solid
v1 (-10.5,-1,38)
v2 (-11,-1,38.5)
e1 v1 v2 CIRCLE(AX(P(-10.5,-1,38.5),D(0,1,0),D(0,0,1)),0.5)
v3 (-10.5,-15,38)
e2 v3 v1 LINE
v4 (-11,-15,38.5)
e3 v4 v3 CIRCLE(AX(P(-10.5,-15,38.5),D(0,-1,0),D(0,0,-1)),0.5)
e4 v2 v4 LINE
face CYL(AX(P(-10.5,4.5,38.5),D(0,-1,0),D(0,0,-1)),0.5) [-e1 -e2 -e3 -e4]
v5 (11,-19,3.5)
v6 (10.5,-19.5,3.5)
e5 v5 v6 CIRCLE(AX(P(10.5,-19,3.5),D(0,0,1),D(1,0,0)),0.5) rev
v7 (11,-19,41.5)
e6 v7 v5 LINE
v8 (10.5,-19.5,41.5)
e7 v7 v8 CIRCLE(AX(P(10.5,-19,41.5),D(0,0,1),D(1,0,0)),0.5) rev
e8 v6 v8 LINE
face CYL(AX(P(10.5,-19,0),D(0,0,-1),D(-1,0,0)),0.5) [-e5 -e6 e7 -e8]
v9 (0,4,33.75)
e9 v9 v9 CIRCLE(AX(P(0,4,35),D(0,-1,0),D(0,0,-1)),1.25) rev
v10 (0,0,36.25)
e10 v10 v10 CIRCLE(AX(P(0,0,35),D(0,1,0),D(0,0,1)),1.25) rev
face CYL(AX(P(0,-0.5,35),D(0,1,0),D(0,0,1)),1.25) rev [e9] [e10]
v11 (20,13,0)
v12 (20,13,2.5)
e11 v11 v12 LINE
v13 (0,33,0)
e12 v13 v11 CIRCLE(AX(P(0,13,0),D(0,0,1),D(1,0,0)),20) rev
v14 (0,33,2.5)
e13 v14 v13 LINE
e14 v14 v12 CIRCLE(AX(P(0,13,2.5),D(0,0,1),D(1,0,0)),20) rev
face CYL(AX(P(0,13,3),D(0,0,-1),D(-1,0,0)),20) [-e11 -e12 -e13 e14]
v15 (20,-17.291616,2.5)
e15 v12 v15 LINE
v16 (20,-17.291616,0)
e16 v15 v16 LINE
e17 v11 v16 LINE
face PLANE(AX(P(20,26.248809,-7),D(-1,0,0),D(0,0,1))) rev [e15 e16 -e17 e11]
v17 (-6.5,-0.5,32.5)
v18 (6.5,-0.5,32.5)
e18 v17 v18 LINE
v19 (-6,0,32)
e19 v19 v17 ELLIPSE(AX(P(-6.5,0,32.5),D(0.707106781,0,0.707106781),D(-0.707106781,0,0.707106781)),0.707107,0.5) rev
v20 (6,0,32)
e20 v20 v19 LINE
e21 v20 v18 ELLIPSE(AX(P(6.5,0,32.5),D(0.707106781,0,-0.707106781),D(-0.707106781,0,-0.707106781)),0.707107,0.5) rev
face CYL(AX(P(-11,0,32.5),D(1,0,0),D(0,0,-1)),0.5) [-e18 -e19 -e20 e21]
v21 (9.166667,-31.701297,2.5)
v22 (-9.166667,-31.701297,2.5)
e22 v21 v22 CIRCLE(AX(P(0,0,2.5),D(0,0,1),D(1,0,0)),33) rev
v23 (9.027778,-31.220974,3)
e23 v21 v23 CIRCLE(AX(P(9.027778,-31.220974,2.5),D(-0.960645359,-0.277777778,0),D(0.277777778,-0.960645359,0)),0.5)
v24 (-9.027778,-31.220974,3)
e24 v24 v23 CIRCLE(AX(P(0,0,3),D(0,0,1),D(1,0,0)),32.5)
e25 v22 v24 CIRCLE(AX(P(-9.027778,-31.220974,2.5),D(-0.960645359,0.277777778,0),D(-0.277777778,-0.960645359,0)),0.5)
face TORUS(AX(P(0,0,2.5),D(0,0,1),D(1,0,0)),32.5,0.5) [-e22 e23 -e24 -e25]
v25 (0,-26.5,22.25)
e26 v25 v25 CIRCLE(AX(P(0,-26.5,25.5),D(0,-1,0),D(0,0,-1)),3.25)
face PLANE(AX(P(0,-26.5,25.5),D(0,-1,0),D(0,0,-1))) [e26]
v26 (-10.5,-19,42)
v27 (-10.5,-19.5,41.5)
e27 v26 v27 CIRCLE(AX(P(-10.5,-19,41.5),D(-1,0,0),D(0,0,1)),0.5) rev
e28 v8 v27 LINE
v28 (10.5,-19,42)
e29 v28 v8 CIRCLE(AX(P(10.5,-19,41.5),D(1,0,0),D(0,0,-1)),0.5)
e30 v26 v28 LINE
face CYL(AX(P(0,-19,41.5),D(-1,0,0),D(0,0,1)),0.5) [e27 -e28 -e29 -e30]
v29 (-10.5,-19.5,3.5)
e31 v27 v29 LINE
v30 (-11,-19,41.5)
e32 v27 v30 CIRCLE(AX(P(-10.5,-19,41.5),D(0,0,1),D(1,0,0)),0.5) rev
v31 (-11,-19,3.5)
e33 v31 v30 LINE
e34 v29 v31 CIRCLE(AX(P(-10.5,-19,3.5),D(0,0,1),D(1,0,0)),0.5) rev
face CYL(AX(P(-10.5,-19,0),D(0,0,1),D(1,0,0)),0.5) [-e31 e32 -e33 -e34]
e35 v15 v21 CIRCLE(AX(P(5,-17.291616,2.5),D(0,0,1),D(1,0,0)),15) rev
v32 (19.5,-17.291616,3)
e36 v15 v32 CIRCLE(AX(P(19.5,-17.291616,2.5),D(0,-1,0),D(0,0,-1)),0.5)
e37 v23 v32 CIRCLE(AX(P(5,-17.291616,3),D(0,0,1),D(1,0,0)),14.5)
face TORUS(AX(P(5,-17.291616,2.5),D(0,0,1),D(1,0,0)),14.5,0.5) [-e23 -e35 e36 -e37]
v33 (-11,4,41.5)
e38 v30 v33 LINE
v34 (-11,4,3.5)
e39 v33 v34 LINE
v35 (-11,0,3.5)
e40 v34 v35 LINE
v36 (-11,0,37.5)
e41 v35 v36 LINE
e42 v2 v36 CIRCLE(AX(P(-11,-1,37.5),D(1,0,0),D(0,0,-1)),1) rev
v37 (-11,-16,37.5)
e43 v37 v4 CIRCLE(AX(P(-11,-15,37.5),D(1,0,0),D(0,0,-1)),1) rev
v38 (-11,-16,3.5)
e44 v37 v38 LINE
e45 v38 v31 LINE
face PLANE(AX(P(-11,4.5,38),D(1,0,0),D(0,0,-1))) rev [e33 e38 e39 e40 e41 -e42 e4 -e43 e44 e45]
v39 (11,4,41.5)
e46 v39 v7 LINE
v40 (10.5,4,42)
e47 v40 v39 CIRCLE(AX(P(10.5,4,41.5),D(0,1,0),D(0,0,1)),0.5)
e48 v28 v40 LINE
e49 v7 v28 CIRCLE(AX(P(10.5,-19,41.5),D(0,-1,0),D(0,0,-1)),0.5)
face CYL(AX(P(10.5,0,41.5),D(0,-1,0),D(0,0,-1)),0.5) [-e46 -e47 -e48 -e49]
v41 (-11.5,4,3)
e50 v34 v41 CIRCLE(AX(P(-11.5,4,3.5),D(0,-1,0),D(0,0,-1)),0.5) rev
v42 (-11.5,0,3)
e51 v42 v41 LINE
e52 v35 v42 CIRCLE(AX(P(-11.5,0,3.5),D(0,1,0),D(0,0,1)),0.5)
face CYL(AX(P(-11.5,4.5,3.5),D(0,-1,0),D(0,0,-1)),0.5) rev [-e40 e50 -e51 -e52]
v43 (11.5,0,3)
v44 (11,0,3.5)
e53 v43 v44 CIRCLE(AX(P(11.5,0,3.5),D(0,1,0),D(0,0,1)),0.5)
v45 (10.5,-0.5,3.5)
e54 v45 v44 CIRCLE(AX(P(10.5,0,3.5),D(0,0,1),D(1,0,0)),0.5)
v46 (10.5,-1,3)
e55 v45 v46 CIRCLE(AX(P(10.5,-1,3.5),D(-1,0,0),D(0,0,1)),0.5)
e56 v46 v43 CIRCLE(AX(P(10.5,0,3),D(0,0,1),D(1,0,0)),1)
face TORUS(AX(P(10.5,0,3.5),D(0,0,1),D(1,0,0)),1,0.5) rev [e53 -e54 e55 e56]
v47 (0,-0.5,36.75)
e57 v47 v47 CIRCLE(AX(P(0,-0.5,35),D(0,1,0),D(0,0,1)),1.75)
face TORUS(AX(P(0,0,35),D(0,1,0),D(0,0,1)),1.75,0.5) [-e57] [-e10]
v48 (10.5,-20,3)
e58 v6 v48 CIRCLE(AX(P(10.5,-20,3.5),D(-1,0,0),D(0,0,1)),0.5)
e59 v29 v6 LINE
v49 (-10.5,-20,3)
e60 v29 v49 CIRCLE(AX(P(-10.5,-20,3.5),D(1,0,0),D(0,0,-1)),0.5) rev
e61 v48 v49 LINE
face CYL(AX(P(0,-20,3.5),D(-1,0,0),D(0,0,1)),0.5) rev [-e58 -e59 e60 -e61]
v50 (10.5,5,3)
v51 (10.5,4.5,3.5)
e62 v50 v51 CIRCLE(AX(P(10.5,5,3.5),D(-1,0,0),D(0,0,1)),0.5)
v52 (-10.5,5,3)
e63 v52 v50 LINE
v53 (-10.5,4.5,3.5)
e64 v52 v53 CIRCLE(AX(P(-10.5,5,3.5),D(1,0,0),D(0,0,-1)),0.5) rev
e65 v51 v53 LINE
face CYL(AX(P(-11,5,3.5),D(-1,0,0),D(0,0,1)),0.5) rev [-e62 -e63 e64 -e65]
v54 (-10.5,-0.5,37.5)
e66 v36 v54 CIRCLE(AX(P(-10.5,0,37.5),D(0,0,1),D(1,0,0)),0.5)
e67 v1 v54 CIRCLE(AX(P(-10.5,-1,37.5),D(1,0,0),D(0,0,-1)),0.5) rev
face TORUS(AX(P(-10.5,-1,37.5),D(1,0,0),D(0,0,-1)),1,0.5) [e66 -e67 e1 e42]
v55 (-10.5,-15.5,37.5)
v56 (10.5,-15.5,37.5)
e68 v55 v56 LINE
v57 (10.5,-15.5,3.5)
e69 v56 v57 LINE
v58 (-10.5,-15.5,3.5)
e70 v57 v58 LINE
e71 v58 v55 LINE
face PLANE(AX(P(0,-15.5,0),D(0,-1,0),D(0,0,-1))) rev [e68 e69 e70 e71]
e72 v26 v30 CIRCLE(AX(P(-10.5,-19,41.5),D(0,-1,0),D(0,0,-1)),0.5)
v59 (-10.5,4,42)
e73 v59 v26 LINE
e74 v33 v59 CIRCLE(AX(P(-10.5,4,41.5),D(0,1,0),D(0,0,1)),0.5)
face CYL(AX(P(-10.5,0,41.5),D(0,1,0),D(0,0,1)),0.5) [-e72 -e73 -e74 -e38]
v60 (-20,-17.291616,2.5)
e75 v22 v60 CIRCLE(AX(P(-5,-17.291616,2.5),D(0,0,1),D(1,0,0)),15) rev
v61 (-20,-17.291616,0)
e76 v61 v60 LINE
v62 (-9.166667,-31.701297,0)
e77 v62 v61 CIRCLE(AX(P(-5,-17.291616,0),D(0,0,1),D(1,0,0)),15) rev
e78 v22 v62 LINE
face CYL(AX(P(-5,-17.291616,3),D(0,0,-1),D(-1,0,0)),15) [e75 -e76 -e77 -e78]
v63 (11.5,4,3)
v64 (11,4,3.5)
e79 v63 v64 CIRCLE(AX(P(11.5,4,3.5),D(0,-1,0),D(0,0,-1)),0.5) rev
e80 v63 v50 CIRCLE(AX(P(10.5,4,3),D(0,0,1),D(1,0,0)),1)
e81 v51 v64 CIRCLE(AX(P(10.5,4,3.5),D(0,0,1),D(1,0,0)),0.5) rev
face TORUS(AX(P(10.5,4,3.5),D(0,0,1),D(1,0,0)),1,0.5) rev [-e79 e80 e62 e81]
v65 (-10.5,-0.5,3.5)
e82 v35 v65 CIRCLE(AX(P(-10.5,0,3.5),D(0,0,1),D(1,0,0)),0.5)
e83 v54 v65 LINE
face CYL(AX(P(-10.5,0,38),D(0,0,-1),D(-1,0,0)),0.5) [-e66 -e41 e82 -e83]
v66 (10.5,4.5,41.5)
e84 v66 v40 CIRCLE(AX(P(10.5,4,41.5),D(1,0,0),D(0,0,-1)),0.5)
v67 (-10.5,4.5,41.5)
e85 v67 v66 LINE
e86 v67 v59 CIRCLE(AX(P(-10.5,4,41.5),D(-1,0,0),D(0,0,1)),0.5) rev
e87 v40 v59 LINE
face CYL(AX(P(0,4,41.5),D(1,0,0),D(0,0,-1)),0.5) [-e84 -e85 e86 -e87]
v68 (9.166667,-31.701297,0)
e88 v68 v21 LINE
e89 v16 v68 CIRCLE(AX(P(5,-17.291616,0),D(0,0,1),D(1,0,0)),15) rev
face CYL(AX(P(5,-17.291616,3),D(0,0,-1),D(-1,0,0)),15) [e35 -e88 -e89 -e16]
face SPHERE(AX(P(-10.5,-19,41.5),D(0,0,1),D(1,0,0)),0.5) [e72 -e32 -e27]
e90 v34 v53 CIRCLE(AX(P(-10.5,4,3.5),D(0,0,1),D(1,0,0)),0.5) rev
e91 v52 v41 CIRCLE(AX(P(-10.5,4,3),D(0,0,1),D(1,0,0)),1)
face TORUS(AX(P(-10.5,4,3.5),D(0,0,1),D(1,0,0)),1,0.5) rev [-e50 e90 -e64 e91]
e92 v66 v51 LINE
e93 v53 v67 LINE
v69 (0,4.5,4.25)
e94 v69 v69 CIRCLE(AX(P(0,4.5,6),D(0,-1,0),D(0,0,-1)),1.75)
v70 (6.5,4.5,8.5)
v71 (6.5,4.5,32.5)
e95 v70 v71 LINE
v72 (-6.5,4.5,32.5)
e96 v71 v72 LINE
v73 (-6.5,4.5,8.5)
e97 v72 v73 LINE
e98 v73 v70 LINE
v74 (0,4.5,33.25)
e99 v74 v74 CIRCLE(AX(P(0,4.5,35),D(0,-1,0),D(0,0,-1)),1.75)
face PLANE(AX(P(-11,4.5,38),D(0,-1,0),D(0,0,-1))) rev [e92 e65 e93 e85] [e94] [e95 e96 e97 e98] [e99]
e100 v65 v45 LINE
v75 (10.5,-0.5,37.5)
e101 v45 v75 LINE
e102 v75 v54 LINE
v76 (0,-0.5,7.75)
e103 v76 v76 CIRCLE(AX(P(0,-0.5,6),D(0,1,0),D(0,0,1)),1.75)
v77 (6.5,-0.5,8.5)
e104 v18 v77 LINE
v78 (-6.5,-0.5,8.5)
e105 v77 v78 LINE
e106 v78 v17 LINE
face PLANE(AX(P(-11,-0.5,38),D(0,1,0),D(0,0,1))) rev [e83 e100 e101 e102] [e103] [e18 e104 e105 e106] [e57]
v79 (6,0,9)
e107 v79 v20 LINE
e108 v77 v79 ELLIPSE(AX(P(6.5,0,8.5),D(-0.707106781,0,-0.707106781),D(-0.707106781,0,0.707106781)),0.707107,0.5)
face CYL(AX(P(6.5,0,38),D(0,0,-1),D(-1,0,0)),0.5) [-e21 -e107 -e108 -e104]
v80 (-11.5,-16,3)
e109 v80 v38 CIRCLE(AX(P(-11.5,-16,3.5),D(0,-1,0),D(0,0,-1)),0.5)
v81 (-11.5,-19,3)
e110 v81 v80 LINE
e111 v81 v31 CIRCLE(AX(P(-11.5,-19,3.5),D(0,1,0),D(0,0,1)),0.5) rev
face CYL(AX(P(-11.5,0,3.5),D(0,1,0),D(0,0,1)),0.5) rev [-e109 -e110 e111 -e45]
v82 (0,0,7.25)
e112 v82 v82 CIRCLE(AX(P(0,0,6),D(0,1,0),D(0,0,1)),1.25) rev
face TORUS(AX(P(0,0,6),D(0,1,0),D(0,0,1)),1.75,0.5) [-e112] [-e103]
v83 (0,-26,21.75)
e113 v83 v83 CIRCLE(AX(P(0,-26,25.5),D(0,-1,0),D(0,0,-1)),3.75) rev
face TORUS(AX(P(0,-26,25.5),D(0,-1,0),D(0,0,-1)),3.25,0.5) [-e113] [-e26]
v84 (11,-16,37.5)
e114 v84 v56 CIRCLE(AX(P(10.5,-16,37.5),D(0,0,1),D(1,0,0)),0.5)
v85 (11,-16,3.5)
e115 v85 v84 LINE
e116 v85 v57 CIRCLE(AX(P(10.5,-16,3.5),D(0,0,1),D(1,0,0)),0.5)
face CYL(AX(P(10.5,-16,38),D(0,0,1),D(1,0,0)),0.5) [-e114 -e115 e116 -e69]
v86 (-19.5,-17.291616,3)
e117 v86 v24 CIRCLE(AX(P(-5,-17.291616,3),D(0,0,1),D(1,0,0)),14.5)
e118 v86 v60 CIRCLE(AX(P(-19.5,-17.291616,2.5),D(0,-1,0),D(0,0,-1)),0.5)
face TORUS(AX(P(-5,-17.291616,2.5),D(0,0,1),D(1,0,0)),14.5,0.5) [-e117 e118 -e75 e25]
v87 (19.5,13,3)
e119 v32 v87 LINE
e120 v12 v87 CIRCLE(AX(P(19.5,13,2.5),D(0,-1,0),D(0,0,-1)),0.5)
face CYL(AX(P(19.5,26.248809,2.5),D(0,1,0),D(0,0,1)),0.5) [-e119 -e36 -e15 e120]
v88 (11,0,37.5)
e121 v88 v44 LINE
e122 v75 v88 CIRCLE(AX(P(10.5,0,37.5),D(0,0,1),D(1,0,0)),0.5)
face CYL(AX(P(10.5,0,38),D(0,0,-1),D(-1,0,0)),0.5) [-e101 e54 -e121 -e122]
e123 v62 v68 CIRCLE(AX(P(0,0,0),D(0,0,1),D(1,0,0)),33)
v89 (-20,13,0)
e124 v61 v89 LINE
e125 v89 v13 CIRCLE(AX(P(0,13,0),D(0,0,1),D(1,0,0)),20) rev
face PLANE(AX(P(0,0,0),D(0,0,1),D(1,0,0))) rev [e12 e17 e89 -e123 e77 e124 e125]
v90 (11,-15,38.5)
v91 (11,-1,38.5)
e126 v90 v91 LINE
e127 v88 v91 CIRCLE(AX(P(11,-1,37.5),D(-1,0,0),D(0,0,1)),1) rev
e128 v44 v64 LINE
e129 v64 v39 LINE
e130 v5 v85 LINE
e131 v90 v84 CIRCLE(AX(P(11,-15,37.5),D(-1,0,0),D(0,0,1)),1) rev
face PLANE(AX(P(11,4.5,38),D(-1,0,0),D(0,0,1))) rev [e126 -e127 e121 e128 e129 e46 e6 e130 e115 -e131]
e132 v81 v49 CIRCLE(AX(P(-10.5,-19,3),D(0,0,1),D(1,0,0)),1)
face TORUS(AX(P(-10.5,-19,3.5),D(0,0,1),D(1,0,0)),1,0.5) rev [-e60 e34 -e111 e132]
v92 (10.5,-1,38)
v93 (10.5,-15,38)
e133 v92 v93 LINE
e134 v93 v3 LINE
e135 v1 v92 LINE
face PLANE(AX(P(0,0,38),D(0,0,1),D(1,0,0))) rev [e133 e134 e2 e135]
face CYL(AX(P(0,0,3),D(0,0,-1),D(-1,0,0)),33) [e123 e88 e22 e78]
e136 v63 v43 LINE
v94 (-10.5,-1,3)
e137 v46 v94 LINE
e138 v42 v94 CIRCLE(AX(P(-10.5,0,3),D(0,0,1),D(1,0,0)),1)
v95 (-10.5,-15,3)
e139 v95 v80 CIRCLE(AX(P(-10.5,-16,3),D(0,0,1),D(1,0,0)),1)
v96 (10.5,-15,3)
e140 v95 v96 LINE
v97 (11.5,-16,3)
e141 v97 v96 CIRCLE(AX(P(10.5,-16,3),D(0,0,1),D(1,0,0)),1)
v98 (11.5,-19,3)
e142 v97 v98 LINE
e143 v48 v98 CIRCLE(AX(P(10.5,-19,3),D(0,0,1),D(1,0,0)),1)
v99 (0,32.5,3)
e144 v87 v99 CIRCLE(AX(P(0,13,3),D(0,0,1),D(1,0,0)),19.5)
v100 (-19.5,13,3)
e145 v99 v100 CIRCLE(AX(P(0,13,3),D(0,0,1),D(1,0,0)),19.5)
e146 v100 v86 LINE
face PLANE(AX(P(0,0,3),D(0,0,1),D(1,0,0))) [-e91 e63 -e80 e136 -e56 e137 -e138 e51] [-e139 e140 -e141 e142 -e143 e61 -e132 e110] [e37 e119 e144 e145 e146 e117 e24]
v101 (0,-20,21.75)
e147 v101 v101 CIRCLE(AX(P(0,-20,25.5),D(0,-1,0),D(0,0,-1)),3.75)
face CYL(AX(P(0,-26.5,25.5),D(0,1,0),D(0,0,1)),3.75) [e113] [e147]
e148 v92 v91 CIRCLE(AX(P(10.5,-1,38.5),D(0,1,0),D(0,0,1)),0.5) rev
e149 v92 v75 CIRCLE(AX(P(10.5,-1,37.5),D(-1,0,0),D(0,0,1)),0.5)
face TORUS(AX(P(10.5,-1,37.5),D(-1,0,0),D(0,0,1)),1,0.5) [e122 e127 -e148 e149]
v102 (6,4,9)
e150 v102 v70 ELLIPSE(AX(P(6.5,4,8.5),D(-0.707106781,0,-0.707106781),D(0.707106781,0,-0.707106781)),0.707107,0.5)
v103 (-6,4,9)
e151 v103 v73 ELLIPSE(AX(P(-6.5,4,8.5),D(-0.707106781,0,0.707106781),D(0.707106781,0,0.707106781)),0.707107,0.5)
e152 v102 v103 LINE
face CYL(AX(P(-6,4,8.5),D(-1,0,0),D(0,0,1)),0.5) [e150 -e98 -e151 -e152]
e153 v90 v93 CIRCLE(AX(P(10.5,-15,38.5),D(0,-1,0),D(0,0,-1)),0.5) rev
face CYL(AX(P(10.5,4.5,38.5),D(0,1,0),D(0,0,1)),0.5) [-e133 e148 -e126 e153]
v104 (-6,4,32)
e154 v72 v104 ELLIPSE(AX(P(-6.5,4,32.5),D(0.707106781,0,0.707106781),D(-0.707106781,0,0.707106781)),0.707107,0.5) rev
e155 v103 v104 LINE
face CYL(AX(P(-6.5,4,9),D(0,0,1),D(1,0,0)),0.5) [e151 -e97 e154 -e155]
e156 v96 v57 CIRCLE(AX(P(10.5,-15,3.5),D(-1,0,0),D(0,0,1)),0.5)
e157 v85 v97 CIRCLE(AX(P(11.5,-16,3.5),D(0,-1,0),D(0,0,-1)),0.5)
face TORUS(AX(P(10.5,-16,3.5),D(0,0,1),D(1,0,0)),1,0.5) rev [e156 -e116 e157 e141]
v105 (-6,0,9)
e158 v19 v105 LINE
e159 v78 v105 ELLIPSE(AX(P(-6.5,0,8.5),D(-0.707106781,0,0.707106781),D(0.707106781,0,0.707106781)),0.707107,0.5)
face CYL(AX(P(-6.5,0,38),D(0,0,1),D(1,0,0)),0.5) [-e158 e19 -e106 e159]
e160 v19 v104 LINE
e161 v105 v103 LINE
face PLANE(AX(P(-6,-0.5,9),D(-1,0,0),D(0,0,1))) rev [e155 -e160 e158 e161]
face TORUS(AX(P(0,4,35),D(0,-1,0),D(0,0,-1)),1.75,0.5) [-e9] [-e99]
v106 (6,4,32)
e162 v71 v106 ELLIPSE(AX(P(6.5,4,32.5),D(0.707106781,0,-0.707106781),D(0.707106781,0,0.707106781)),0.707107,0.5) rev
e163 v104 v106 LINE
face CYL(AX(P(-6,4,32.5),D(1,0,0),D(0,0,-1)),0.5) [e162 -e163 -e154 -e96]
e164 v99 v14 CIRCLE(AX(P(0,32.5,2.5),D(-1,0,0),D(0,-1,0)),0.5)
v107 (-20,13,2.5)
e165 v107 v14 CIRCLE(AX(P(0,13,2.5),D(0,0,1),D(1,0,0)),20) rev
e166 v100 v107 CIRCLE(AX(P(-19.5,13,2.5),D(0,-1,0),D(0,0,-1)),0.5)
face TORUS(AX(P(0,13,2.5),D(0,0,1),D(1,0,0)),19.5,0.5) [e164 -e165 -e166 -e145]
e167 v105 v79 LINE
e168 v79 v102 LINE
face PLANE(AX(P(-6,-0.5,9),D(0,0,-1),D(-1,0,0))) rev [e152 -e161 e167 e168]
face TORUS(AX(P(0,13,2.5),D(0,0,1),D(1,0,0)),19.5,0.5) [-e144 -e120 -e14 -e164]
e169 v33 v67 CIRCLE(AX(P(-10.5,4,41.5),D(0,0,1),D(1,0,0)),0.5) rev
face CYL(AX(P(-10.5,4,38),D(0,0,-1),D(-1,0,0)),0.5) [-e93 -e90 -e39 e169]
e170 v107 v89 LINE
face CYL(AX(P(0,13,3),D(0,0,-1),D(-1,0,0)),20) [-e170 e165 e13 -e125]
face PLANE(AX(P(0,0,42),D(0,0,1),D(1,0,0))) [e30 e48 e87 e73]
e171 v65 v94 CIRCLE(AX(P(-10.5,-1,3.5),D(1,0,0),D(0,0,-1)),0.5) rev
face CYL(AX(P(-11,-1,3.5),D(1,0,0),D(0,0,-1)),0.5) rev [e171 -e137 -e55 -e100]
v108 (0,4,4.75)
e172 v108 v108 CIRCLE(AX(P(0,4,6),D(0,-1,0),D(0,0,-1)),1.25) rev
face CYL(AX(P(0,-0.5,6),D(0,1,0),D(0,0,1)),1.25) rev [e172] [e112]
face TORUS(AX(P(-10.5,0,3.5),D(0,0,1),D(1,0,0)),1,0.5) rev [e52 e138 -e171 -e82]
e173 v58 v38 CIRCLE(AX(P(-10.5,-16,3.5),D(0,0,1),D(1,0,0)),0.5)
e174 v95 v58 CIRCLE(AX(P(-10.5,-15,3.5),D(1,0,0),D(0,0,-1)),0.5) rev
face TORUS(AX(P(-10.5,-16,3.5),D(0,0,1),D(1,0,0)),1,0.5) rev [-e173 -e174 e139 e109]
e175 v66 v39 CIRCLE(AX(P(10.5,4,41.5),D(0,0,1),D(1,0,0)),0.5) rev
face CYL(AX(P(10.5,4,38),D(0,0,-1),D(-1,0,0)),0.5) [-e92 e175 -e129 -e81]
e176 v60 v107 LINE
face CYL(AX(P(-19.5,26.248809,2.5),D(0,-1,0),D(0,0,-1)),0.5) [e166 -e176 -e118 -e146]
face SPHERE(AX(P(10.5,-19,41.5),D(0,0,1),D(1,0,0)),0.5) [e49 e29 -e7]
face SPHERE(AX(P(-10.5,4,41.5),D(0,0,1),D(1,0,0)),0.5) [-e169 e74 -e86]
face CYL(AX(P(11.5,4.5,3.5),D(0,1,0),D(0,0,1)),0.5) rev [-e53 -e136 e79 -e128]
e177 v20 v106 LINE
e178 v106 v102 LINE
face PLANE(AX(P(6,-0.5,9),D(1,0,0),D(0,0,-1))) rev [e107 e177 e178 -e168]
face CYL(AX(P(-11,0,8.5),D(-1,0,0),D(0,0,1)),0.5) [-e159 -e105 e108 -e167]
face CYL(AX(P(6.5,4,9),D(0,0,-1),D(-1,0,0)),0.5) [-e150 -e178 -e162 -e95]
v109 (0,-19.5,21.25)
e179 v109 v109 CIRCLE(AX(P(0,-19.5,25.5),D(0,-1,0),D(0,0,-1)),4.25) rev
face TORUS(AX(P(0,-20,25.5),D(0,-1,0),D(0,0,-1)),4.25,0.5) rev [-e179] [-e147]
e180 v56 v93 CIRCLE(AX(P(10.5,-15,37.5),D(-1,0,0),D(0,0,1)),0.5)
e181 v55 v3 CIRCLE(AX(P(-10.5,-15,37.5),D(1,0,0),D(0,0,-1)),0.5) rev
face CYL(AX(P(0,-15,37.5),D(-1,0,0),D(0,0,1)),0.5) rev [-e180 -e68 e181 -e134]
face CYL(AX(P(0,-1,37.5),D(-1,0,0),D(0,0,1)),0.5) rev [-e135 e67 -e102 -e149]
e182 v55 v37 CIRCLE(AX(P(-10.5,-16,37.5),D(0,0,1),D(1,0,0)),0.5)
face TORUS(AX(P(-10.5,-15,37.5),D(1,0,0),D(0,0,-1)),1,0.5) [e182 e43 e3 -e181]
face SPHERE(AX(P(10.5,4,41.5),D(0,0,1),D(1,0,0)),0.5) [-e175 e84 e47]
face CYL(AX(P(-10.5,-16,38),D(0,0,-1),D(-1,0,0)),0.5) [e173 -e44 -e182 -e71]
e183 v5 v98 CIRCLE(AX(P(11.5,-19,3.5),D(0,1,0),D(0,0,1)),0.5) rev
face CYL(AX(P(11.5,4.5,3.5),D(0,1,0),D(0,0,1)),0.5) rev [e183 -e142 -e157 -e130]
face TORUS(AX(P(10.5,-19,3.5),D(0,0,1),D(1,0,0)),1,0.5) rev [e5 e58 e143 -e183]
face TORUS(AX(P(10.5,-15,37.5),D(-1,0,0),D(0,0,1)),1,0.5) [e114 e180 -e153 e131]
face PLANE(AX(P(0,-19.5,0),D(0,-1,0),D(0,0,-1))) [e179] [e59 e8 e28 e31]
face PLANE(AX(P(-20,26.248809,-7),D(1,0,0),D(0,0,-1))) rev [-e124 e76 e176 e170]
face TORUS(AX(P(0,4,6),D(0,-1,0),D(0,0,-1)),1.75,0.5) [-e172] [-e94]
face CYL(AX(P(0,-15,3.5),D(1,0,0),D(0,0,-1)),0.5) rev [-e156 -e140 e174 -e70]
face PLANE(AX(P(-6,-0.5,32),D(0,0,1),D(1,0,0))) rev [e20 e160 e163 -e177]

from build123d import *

# Parameters (mm, degrees)
SKETCH1_R           = 33
BOSS_EXTRUDE1_DEPTH = 3
CUT_EXTRUDE3_START  = -10
CUT_EXTRUDE3_DEPTH  = 10
FILLET2_R           = 20
FILLET3_R           = 15
SKETCH4_W           = 22
SKETCH4_H           = 5
BOSS_EXTRUDE2_DEPTH = 35
SKETCH5_W           = 12
SKETCH5_H           = 23
CUT_EXTRUDE1_DEPTH  = 5
SKETCH6_R           = 1.25
CUT_EXTRUDE2_DEPTH  = 5
SKETCH7_W           = 22
SKETCH7_H           = 20
BOSS_EXTRUDE3_DEPTH = 4
SKETCH8_W           = 22
SKETCH8_H           = 39
BOSS_EXTRUDE4_DEPTH = 4
SKETCH9_R           = 3.75
BOSS_EXTRUDE5_DEPTH = 7
FILLET4_R           = 0.5


with BuildPart() as part:
    # Sketch1 → Boss-Extrude1 (new body)
    with BuildSketch(Plane.XY):
        Circle(SKETCH1_R)
    extrude(amount=BOSS_EXTRUDE1_DEPTH)

    # Sketch10 → Cut-Extrude3 (cut)
    with BuildSketch(Plane.XY.offset(3).offset(CUT_EXTRUDE3_START)):
        with BuildLine():
            Line((-20, 26.248809497), (-20, -26.248809497))
            ThreePointArc((-20, -26.248809497), (-33, 0), (-20, 26.248809497))
        make_face()
        with BuildLine():
            Line((20, 26.248809497), (20, -26.248809497))
            ThreePointArc((20, -26.248809497), (33, 0), (20, 26.248809497))
        make_face()
    extrude(amount=CUT_EXTRUDE3_DEPTH, mode=Mode.SUBTRACT)

    # Fillet2
    fillet2_edges = [part.edges().sort_by_distance(p)[0] for p in [
        (-20, 26.248809497, 1.5),
        (20, 26.248809497, 1.5),
    ]]
    fillet(fillet2_edges, radius=FILLET2_R - 0.0001)  # a hair under: the kernel refuses the full size

    # Fillet3
    fillet3_edges = [part.edges().sort_by_distance(p)[0] for p in [
        (-20, -26.248809497, 1.5),
        (20, -26.248809497, 1.5),
    ]]
    fillet(fillet3_edges, radius=FILLET3_R)

    # Sketch4 → Boss-Extrude2 (add)
    with BuildSketch(Plane.XY.offset(3)):
        with Locations((0, 2)):
            Rectangle(SKETCH4_W, SKETCH4_H)
    extrude(amount=BOSS_EXTRUDE2_DEPTH)

    # Sketch5 → Cut-Extrude1 (cut)
    with BuildSketch(Plane(origin=(0, 4.5, 0), x_dir=(1, 0, 0), z_dir=(0, 1, 0))):
        with Locations((0, -20.5)):
            Rectangle(SKETCH5_W, SKETCH5_H)
    extrude(amount=-CUT_EXTRUDE1_DEPTH, mode=Mode.SUBTRACT)

    # Sketch6 → Cut-Extrude2 (cut)
    with BuildSketch(Plane(origin=(0, 4.5, 0), x_dir=(1, 0, 0), z_dir=(0, 1, 0))):
        with Locations(Location((0, -6, 0), (0, 0, 270))):
            Circle(SKETCH6_R)
        with Locations(Location((0, -35, 0), (0, 0, 270))):
            Circle(SKETCH6_R)
    extrude(amount=-CUT_EXTRUDE2_DEPTH, mode=Mode.SUBTRACT)

    # Sketch7 → Boss-Extrude3 (add)
    with BuildSketch(Plane.XY.offset(38)):
        with Locations((0, -5.5)):
            Rectangle(SKETCH7_W, SKETCH7_H)
    extrude(amount=BOSS_EXTRUDE3_DEPTH)

    # Sketch8 → Boss-Extrude4 (add)
    with BuildSketch(Plane.XZ.offset(15.5)):
        with Locations((0, 22.5)):
            Rectangle(SKETCH8_W, SKETCH8_H)
    extrude(amount=BOSS_EXTRUDE4_DEPTH)

    # Sketch9 → Boss-Extrude5 (add)
    with BuildSketch(Plane.XZ.offset(19.5)):
        with Locations(Location((0, 25.5, 0), (0, 0, 270))):
            Circle(SKETCH9_R)
    extrude(amount=BOSS_EXTRUDE5_DEPTH)

    # Fillet4
    fillet4_edges = [part.edges().sort_by_distance(p)[0] for p in [
        (-11, -15.5, 20.5),
        (0, -15.5, 3),
        (-11, -17.5, 3),
        (11, -15.5, 20.5),
        (11, -17.5, 3),
        (-11, -19.5, 22.5),
        (0, -19.5, 3),
        (11, -19.5, 22.5),
        (0, -19.5, 42),
        (0, -19.5, 29.25),
        (0, -26.5, 29.25),
        (20, -2.145758233, 3),
        (14.142219305, 27.14211052, 3),
        (-14.142219305, 27.14211052, 3),
        (0, -33, 3),
        (-20, -2.145758233, 3),
        (-16.989578808, -26.305494654, 3),
        (16.989578808, -26.305494654, 3),
        (11, 2, 3),
        (11, -0.5, 20.5),
        (0, 4.5, 3),
        (11, 4.5, 22.5),
        (-11, 2, 3),
        (-11, 4.5, 22.5),
        (0, -0.5, 3),
        (-11, -0.5, 20.5),
        (0, -0.5, 38),
        (6, -0.5, 20.5),
        (0, -0.5, 32),
        (-6, -0.5, 20.5),
        (0, -0.5, 9),
        (6, 4.5, 20.5),
        (0, 4.5, 9),
        (-6, 4.5, 20.5),
        (0, 4.5, 32),
        (0, -0.5, 4.75),
        (0, 4.5, 4.75),
        (0, -0.5, 33.75),
        (0, 4.5, 33.75),
        (-11, -8, 38),
        (0, -15.5, 38),
        (11, -8, 38),
        (-11, -7.5, 42),
        (11, -7.5, 42),
        (0, 4.5, 42),
    ]]
    fillet(fillet4_edges, radius=FILLET4_R)


solid = part.part
